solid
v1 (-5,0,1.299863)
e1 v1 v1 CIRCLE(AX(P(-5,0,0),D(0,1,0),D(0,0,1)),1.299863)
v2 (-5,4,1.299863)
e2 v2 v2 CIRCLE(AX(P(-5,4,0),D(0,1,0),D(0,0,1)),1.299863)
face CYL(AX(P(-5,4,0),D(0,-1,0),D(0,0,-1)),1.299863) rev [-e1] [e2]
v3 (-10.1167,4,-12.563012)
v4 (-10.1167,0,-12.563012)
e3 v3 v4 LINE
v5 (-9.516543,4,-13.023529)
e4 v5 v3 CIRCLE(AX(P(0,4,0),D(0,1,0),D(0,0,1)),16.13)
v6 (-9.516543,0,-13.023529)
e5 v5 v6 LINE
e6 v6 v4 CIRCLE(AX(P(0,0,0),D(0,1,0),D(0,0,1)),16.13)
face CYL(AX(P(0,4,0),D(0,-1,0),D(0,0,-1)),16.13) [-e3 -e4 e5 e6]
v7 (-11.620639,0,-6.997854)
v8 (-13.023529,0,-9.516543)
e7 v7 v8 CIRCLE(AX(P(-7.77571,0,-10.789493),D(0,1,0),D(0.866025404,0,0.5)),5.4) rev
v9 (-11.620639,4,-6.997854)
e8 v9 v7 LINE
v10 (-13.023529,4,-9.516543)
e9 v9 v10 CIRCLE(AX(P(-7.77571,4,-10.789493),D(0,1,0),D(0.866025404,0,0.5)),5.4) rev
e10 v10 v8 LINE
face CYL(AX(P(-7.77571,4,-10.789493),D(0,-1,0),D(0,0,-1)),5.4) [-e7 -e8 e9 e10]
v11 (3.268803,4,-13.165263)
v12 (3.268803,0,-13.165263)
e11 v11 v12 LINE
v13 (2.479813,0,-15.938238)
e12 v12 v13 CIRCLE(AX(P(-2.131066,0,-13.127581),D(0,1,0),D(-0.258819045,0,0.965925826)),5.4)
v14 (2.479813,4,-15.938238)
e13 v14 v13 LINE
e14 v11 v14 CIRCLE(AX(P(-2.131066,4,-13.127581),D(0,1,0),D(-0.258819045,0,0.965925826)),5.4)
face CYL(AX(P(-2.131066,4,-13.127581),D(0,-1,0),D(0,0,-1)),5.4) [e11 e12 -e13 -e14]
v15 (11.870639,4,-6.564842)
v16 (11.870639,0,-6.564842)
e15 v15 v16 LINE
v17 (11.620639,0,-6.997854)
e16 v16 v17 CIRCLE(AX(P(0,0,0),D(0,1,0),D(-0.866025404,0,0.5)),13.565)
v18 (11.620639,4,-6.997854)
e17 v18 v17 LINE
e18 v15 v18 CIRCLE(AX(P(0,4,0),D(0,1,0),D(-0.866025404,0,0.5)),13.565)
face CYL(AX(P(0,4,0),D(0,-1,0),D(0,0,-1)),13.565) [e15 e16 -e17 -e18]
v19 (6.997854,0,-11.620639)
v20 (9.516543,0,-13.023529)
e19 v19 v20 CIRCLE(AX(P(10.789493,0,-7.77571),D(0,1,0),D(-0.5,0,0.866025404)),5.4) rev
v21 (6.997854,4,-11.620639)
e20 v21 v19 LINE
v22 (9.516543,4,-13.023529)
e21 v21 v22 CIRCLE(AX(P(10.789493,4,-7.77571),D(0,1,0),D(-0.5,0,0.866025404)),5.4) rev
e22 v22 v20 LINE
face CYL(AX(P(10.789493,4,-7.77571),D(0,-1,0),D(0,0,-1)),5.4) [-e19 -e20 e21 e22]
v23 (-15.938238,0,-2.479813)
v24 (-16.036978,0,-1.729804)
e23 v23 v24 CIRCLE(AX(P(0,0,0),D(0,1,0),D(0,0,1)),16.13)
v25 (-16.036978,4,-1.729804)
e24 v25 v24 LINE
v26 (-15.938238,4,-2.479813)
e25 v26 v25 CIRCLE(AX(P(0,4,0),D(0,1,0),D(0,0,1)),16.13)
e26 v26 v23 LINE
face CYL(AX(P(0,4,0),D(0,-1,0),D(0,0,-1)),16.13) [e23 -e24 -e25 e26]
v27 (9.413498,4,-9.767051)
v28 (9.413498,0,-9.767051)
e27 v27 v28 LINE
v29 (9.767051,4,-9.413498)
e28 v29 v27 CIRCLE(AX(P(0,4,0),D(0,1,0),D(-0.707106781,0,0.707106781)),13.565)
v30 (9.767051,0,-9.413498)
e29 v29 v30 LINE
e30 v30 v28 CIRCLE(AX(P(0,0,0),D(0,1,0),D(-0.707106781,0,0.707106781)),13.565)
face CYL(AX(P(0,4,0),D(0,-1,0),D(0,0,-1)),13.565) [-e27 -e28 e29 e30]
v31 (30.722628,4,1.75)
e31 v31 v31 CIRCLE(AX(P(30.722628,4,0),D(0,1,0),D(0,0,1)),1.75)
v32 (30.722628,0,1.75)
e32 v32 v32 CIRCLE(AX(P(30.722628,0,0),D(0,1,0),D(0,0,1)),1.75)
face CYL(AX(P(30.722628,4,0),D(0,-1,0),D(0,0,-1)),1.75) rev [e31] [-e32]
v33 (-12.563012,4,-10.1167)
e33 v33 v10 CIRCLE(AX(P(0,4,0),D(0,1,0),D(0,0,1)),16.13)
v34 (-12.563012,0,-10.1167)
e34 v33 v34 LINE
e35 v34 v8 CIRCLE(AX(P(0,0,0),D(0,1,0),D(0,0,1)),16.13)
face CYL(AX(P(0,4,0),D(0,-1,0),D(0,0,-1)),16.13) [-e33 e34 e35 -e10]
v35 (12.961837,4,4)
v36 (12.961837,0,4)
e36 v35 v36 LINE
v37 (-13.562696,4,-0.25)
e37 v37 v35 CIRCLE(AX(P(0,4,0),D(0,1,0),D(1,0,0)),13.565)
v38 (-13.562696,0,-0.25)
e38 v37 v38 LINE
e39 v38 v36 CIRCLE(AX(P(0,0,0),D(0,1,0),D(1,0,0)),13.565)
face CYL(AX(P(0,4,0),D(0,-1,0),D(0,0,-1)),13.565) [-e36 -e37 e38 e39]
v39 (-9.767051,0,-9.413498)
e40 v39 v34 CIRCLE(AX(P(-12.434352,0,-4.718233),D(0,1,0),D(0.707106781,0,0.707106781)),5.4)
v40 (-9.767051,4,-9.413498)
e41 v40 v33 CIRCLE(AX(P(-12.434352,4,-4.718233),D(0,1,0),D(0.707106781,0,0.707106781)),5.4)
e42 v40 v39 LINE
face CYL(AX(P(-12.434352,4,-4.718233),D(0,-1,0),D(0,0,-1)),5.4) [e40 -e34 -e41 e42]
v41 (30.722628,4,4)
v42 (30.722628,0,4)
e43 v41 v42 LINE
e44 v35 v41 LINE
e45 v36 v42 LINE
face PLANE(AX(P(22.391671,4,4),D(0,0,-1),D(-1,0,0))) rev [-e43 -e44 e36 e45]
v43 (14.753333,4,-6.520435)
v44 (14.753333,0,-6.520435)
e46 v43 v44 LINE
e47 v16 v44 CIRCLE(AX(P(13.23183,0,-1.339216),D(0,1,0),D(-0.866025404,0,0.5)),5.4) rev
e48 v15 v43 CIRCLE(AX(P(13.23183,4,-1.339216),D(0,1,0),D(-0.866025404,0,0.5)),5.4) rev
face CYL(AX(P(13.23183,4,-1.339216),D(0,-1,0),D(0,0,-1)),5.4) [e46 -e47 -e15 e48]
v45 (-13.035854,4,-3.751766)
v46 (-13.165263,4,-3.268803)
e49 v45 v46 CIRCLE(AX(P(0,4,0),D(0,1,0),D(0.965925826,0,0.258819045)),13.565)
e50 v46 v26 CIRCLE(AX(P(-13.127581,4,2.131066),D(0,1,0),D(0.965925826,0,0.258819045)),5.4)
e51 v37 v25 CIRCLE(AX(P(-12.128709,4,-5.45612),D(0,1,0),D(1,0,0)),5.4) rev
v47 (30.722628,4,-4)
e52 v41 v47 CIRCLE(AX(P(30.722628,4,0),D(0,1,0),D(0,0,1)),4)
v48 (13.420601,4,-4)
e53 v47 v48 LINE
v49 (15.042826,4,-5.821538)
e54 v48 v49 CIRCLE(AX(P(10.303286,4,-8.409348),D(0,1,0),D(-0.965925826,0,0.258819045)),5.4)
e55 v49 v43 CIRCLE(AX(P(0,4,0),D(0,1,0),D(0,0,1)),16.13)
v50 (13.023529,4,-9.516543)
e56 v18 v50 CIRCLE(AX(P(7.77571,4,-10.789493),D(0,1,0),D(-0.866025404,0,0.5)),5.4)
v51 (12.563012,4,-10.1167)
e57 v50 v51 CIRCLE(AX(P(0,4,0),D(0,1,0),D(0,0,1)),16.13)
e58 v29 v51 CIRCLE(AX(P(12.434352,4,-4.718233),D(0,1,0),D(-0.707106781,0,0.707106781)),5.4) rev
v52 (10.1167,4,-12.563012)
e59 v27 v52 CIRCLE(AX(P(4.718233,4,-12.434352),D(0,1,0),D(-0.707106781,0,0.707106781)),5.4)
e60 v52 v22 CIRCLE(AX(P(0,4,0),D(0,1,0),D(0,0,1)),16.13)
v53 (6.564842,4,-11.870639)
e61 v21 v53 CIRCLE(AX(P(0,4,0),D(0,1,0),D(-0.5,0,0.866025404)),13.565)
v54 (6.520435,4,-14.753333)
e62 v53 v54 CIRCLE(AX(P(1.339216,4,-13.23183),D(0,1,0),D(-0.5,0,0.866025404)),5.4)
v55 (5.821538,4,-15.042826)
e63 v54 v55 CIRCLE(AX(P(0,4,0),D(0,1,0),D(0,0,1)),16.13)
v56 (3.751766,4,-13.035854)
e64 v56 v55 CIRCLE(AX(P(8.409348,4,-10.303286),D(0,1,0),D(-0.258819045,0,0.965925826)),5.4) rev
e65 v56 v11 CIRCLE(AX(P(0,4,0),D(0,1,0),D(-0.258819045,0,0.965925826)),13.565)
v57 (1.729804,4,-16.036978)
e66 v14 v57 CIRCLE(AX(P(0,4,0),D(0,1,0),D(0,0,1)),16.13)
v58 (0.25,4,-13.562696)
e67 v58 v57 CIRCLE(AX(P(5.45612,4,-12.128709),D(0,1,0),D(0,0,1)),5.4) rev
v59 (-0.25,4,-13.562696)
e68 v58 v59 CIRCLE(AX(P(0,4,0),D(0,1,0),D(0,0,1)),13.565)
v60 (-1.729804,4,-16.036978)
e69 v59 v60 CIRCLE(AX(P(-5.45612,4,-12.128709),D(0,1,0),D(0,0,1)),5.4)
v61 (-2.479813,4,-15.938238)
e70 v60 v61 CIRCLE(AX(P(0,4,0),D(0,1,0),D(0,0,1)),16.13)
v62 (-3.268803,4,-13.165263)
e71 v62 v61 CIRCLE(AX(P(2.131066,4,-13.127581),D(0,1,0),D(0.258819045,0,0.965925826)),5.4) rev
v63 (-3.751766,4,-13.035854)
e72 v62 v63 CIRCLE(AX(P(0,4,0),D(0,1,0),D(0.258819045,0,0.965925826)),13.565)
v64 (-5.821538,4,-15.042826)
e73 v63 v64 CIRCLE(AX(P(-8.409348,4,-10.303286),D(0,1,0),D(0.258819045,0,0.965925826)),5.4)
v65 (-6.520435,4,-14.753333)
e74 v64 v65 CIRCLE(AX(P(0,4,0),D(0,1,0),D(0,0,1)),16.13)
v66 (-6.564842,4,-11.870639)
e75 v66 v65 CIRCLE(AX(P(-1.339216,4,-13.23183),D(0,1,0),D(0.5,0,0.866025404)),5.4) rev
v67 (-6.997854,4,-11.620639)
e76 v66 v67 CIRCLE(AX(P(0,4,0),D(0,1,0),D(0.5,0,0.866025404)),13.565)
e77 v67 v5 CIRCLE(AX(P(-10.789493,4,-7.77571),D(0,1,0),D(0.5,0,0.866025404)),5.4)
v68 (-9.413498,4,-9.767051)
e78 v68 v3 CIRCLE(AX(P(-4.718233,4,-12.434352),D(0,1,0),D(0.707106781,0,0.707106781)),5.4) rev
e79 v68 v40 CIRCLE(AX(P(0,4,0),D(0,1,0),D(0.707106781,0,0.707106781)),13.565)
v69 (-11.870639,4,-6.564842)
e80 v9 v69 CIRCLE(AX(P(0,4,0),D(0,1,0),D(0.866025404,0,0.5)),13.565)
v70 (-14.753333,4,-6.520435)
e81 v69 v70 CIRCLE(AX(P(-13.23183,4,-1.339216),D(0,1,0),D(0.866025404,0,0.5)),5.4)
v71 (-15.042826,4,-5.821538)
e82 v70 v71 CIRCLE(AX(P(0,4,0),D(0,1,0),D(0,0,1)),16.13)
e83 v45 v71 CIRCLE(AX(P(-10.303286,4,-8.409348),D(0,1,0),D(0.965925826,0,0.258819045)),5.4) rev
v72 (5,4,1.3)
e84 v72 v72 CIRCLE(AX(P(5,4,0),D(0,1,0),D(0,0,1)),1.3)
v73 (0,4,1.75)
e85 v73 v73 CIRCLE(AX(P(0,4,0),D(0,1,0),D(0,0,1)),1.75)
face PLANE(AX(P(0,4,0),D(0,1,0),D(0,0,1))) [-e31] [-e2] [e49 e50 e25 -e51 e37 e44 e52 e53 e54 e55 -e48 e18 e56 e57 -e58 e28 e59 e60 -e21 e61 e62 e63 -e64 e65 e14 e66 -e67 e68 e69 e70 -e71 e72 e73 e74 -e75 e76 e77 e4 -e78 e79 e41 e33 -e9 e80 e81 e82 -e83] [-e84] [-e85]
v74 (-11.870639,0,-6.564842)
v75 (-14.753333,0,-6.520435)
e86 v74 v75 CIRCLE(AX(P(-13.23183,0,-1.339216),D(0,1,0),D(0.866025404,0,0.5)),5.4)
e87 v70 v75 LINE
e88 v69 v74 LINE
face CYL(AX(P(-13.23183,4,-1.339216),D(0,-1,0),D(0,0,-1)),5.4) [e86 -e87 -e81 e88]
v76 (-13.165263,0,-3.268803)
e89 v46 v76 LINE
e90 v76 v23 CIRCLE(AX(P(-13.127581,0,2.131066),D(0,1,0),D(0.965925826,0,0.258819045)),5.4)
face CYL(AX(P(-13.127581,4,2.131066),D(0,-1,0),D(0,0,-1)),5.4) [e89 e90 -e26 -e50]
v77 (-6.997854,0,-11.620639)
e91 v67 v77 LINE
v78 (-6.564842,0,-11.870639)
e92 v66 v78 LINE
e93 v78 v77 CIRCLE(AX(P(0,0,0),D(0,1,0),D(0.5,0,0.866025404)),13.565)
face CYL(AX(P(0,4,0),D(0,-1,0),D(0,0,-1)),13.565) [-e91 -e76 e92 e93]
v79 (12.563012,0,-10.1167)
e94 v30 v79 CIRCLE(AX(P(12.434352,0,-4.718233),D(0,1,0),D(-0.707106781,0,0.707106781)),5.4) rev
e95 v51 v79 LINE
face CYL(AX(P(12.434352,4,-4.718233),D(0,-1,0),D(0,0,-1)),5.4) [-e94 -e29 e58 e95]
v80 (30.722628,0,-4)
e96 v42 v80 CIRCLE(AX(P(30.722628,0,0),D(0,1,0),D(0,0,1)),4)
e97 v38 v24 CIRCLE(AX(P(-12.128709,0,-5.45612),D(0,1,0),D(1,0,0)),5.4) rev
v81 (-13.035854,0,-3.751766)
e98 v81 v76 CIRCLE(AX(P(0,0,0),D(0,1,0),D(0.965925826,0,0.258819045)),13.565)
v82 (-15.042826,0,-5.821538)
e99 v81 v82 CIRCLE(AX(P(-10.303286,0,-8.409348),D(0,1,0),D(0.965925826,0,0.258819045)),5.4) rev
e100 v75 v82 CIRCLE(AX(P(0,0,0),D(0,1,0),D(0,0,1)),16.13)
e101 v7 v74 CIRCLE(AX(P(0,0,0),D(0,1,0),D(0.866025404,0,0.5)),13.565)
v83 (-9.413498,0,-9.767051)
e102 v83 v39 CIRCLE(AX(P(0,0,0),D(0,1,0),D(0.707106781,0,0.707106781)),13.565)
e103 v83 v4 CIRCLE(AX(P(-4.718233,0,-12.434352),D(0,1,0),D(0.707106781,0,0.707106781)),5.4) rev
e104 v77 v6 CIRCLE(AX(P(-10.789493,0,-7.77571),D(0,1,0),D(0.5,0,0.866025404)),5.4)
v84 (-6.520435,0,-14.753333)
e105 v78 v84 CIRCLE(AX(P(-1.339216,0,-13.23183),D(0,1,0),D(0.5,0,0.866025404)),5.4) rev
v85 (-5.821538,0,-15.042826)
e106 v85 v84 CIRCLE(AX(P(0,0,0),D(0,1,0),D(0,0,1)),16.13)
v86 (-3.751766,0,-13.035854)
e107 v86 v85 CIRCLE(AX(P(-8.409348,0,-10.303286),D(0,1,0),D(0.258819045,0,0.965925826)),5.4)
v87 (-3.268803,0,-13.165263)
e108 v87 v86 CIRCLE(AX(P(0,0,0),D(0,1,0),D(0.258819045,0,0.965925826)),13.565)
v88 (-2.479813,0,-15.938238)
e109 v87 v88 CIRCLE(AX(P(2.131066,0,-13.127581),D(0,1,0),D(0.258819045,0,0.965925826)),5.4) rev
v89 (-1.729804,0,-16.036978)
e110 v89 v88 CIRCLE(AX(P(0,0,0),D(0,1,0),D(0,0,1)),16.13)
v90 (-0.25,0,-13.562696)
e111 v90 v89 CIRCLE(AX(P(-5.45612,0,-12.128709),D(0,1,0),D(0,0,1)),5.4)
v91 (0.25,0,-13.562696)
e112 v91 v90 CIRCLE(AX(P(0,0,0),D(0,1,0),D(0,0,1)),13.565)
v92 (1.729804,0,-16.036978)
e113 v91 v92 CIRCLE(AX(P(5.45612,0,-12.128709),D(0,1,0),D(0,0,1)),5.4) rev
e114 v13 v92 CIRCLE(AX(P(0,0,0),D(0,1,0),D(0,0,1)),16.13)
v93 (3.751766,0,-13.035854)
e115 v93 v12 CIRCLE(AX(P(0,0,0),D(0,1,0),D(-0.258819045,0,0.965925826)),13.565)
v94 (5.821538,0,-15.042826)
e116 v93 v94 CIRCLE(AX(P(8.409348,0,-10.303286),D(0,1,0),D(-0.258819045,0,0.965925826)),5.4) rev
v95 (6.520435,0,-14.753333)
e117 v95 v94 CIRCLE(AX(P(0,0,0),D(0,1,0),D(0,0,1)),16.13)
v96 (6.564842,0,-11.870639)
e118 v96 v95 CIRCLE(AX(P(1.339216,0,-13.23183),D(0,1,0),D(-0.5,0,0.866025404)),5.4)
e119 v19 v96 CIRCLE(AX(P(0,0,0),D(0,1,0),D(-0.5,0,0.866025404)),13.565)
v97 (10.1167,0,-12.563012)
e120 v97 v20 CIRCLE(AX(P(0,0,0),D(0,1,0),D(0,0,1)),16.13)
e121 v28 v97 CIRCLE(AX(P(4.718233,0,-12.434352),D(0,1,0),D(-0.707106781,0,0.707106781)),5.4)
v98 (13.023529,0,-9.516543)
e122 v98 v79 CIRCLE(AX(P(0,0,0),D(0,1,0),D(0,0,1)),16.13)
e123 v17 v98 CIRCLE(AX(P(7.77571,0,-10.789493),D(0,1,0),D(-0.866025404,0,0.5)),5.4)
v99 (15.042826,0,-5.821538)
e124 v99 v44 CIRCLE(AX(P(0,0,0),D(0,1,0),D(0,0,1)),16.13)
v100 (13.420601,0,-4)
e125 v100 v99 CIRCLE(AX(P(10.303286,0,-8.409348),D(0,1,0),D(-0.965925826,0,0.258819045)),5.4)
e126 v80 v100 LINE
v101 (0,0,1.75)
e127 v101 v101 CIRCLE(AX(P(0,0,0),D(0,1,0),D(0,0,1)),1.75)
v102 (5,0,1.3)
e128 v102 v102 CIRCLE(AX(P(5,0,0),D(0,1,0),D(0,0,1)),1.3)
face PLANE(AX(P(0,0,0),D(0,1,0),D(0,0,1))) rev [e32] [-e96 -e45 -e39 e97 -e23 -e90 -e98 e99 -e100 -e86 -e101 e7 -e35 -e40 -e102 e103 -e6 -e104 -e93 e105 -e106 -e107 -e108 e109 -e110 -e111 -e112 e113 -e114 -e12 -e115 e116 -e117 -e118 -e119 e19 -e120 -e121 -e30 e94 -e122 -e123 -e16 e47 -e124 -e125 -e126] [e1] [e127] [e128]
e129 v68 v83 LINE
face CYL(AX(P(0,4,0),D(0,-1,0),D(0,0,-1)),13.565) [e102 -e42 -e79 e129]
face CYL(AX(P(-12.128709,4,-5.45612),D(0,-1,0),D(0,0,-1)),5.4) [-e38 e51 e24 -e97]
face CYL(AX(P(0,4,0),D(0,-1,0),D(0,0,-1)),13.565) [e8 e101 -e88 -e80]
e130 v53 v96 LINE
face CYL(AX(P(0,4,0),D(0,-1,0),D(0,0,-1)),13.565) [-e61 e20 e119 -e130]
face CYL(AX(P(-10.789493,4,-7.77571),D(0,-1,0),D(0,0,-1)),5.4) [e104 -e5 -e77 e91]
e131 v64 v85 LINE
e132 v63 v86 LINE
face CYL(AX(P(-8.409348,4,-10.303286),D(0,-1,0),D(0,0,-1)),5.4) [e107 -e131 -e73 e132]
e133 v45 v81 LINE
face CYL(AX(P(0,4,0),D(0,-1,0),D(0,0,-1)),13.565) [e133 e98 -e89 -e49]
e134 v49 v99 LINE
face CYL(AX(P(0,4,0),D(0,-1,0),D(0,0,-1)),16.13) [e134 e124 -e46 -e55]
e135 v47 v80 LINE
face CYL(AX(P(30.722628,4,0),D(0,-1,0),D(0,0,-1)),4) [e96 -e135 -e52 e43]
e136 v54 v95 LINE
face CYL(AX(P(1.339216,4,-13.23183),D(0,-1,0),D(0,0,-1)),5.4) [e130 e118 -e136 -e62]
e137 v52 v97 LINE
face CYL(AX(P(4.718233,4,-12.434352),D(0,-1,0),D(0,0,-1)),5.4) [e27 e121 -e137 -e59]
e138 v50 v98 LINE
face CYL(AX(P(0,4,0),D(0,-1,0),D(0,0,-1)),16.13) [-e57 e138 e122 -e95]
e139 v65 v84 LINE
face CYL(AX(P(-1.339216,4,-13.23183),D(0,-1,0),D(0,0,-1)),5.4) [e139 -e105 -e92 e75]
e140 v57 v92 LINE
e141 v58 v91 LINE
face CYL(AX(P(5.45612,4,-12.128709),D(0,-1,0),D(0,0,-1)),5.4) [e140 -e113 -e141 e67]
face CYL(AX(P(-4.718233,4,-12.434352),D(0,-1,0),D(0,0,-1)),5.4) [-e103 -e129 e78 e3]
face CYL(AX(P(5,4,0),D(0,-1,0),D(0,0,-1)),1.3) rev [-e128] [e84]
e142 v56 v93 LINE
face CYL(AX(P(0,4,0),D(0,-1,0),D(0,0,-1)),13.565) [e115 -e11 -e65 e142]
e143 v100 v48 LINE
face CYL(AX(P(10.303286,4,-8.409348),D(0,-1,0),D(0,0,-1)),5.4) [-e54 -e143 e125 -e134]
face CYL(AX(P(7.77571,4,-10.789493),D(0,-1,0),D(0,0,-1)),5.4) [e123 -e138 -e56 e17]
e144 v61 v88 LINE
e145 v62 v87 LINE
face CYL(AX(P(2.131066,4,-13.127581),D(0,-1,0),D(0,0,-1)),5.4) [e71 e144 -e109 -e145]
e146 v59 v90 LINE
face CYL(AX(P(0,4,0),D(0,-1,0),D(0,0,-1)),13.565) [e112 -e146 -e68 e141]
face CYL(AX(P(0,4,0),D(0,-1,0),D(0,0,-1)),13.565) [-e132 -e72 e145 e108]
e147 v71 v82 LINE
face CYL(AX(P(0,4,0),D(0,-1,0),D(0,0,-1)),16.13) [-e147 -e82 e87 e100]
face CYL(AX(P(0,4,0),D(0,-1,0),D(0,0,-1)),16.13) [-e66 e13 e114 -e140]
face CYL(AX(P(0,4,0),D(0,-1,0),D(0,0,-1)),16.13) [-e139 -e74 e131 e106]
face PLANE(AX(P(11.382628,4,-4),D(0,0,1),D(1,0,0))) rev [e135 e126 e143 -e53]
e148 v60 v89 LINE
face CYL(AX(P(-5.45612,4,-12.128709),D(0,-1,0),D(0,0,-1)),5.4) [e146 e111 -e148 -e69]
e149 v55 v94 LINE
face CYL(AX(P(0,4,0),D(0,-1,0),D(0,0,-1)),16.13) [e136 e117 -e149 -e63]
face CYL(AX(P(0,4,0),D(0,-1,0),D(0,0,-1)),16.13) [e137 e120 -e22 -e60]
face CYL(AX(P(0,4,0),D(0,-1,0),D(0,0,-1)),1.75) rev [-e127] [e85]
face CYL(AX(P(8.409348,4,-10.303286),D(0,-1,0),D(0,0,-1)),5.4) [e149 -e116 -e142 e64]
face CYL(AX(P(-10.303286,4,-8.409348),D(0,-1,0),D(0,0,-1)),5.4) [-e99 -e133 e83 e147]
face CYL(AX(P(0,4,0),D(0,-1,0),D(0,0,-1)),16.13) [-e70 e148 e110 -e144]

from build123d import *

# Parameters (mm, degrees)
IZIM2_R                     = 16.13
IZIM2_R_2                   = 1.75
IZIM2_R_3                   = 1.3
IZIM2_R_4                   = 1.29986265
Y_KSEKLIK_EKSTR_ZYON1_DEPTH = 4
KES_EKSTR_ZYON2_DEPTH       = 4
DAIRESEL_KAPLAMA2_COUNT     = 24
IZIM4_R                     = 1.75
Y_KSEKLIK_EKSTR_ZYON2_DEPTH = 4
KES_EKSTR_ZYON3_DEPTH       = 4


with BuildPart() as part:
    # Çizim2 → Yükseklik-Ekstrüzyon1 (new body)
    with BuildSketch(Plane(origin=(0, 0, 0), x_dir=(1, 0, 0), z_dir=(0, 1, 0))):
        Circle(IZIM2_R)
        Circle(IZIM2_R_2, mode=Mode.SUBTRACT)
        with Locations((5, 0)):
            Circle(IZIM2_R_3, mode=Mode.SUBTRACT)
        with Locations((-5, 0)):
            Circle(IZIM2_R_4, mode=Mode.SUBTRACT)
    extrude(amount=Y_KSEKLIK_EKSTR_ZYON1_DEPTH)

    # Çizim1 → Kes-Ekstrüzyon2 (cut)
    with BuildSketch(Plane(origin=(0, 0, 0), x_dir=(1, 0, 0), z_dir=(0, 1, 0))):
        with BuildLine():
            ThreePointArc((0.25, 13.562696082), (0.821724337, 14.900419859), (1.729803678, 16.036978495))
            ThreePointArc((1.729803678, 16.036978495), (0, 16.13), (-1.729803678, 16.036978495))
            ThreePointArc((-1.729803678, 16.036978495), (-0.821724337, 14.900419859), (-0.25, 13.562696082))
            ThreePointArc((-0.25, 13.562696082), (-0.125005308, 13.564424008), (0, 13.565))
            ThreePointArc((0, 13.565), (0.125005308, 13.564424008), (0.25, 13.562696082))
        make_face()
    kes_ekstr_zyon2 = extrude(amount=KES_EKSTR_ZYON2_DEPTH, mode=Mode.SUBTRACT)

    # Dairesel Kaplama2: Kes-Ekstrüzyon2 ×24 about axis
    dairesel_kaplama2_axis = Axis((0, 4, 0), (0, 1, 0))
    for i in range(1, DAIRESEL_KAPLAMA2_COUNT):
        add(kes_ekstr_zyon2.rotate(dairesel_kaplama2_axis, i * 360 / DAIRESEL_KAPLAMA2_COUNT), mode=Mode.SUBTRACT)

    # Çizim4 → Yükseklik-Ekstrüzyon2 (add)
    with BuildSketch(Plane(origin=(0, 0, 0), x_dir=(1, 0, 0), z_dir=(0, 1, 0))):
        with BuildLine():
            Line((11.382628211, 4), (22.858544508, 4))
            Line((22.858544508, 4), (30.722628211, 4))
            ThreePointArc((30.722628211, 4), (34.722628211, 0), (30.722628211, -4))
            Line((30.722628211, -4), (22.391671269, -4))
            Line((22.391671269, -4), (11.382628211, -4))
            ThreePointArc((11.382628211, -4), (12.065, 0), (11.382628211, 4))
        make_face()
        with Locations((30.722628211, 0)):
            Circle(IZIM4_R, mode=Mode.SUBTRACT)
    extrude(amount=Y_KSEKLIK_EKSTR_ZYON2_DEPTH)

    # Çizim5 → Kes-Ekstrüzyon3 (cut)
    with BuildSketch(Plane(origin=(0, 0, 0), x_dir=(1, 0, 0), z_dir=(0, 1, 0))):
        with BuildLine():
            Line((-13.565, 0), (-18.52935314, 0))
            Line((-18.52935314, 0), (-18.52935314, -18.21120255))
            Line((-18.52935314, -18.21120255), (15.661629934, -18.576881513))
            Line((15.661629934, -18.576881513), (15.661629934, -4))
            Line((15.661629934, -4), (12.961837254, -4))
            ThreePointArc((12.961837254, -4), (-2.022610028, -13.413361759), (-13.565, 0))
        make_face()
    extrude(amount=KES_EKSTR_ZYON3_DEPTH, mode=Mode.SUBTRACT)


solid = part.part
